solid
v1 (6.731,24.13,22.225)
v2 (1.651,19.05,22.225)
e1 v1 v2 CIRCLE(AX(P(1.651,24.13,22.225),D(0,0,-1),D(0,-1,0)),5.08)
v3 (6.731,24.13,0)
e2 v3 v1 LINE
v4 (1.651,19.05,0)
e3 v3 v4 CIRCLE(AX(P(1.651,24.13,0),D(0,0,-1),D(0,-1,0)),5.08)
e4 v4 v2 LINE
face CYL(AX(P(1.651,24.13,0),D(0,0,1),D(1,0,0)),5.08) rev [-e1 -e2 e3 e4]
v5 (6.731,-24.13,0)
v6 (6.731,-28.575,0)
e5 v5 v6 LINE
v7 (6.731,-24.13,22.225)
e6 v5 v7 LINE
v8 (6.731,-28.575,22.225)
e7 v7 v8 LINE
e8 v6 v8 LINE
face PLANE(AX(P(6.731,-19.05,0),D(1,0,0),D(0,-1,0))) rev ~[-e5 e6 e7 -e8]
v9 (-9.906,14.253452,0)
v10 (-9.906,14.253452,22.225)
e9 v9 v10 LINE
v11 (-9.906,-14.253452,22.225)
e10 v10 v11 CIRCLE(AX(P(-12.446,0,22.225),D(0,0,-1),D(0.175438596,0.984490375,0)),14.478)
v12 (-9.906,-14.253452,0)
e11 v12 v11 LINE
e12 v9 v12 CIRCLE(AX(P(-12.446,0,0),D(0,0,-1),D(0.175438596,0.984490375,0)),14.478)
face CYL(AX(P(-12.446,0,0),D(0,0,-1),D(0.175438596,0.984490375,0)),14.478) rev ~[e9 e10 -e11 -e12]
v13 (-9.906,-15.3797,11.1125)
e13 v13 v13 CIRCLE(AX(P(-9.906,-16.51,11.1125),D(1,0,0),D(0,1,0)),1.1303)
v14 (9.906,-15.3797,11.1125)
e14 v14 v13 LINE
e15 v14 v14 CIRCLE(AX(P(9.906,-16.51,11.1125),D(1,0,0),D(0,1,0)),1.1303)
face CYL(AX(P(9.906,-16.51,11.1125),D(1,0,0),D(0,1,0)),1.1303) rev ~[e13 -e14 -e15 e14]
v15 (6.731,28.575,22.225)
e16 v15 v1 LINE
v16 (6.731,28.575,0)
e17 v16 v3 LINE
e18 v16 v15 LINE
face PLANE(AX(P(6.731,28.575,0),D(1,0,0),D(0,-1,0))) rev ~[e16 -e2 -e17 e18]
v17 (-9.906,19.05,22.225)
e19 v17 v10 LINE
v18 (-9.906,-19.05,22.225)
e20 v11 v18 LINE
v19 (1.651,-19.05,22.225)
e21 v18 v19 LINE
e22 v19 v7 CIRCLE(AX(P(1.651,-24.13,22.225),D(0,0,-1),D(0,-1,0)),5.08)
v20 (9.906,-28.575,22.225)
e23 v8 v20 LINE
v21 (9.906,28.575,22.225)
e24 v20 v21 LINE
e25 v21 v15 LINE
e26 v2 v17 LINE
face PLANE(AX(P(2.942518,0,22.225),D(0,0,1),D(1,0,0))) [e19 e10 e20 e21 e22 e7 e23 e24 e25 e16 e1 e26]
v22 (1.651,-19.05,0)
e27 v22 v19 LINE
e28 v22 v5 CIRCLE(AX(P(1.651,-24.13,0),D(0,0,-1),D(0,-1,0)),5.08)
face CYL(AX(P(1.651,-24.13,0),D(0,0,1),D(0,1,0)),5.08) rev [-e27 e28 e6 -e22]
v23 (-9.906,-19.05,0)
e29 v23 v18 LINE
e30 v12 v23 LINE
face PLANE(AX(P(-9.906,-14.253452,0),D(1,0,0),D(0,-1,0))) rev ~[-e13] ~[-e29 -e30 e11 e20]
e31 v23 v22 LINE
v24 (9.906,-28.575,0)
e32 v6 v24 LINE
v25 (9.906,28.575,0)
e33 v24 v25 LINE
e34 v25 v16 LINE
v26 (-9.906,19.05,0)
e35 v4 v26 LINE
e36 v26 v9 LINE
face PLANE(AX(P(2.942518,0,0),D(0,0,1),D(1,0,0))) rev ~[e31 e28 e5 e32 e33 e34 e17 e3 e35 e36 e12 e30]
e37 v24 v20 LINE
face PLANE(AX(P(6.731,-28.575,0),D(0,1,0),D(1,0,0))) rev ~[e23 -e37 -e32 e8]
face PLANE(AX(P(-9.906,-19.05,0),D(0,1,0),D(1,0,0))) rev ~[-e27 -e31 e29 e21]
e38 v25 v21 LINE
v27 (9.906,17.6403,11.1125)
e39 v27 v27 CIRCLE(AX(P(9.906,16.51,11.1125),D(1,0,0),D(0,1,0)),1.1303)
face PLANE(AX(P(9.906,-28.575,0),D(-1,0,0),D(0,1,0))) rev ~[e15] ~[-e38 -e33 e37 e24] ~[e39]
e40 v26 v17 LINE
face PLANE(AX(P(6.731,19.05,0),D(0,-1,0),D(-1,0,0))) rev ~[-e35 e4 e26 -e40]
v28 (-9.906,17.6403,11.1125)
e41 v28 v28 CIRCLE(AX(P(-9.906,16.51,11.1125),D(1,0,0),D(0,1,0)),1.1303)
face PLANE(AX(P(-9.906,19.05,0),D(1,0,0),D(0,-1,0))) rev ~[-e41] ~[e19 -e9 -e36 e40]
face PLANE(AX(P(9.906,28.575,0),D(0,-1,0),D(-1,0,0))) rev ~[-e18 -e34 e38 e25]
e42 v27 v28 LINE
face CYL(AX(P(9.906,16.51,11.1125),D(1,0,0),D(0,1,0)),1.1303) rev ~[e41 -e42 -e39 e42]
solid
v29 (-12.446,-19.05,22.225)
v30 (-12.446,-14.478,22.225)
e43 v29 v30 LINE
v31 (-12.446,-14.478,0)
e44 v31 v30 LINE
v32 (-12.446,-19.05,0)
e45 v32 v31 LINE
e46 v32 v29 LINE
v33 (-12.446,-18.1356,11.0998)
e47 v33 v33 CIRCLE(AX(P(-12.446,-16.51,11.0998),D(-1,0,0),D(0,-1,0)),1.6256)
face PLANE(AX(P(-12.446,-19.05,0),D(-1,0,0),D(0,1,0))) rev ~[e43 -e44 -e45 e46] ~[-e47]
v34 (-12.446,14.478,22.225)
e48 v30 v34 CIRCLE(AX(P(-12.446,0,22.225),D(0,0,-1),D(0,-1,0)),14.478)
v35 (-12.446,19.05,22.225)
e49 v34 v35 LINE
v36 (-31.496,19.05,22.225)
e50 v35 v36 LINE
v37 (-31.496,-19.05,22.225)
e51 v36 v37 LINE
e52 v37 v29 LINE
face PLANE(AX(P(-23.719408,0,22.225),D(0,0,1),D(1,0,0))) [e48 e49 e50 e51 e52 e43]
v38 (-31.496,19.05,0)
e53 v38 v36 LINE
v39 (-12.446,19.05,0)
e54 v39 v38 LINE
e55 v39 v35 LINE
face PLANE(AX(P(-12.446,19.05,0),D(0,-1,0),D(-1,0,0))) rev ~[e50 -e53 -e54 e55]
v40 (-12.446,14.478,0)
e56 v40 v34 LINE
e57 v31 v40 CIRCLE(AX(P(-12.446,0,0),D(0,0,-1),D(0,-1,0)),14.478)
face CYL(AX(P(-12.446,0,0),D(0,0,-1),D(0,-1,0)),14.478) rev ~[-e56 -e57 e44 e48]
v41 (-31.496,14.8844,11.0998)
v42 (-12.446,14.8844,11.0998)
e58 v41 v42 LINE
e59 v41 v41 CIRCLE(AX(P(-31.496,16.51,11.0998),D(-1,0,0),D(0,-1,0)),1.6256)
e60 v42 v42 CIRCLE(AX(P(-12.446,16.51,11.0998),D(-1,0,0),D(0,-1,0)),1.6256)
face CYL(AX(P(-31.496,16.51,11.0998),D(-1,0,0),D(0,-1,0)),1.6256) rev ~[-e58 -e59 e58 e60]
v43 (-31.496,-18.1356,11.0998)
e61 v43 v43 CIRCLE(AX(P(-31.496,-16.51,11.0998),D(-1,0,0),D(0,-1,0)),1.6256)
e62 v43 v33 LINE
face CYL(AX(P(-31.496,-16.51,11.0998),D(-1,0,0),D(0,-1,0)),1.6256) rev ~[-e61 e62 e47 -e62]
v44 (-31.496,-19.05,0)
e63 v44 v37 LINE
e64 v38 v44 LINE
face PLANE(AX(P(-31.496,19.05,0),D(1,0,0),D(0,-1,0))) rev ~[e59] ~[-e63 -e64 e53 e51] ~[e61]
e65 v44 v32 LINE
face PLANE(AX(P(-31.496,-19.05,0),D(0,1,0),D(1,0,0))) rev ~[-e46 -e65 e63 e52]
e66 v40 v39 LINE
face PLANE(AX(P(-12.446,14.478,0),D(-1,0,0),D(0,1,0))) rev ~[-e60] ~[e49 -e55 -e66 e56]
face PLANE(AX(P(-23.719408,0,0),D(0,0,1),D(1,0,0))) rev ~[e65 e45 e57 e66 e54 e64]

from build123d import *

# Parameters (mm, degrees)
F1_DEPTH = 22.225
F2_R     = 1.1303
F3_DEPTH = 41.403
F4_R     = 5.08
F5_R     = 1.6256
F6_DEPTH = 41.403


with BuildPart() as f1:
    # F0 (on Top) → F1 (new body)
    with BuildSketch(Plane.XY):
        with BuildLine():
            Line((-9.906, -19.05), (6.731, -19.05))
            Line((6.731, -19.05), (6.731, -28.575))
            Line((6.731, -28.575), (9.906, -28.575))
            Line((9.906, -28.575), (9.906, -19.05))
            Line((9.906, -19.05), (9.906, 19.05))
            Line((9.906, 19.05), (9.906, 28.575))
            Line((9.906, 28.575), (6.731, 28.575))
            Line((6.731, 28.575), (6.731, 19.05))
            Line((6.731, 19.05), (-9.906, 19.05))
            Line((-9.906, 19.05), (-9.906, 14.2534516521))
            ThreePointArc((-9.906, 14.2534516521), (2.032, 0), (-9.906, -14.2534516521))
            Line((-9.906, -14.2534516521), (-9.906, -19.05))
        make_face()
    extrude(amount=F1_DEPTH)


with BuildPart() as f1b:
    # F0 (on Top) → F1, piece 2 (new body)
    with BuildSketch(Plane.XY):
        with BuildLine():
            ThreePointArc((-12.446, -14.478), (-26.924, 0), (-12.446, 14.478))
            Line((-12.446, 14.478), (-12.446, 19.05))
            Line((-12.446, 19.05), (-31.496, 19.05))
            Line((-31.496, 19.05), (-31.496, -19.05))
            Line((-31.496, -19.05), (-12.446, -19.05))
            Line((-12.446, -19.05), (-12.446, -14.478))
        make_face()
    extrude(amount=F1_DEPTH)


with BuildPart() as f3_tool:
    # F2 (on face) → F3 (new body, through all)
    with BuildSketch(Plane.YZ.offset(9.906)):
        with Locations((16.51, 11.1125)):
            Circle(F2_R)
        with Locations((-16.51, 11.1125)):
            Circle(F2_R)
    extrude(amount=-F3_DEPTH)


with BuildPart() as f1_1:
    add(f1.part)

    # F3: cut by f3_tool
    add(f3_tool.part, mode=Mode.SUBTRACT)

    # F4
    f4_edges = [f1_1.edges().sort_by_distance(p)[0] for p in [
        (6.731, -19.05, 11.1125),
        (6.731, 19.05, 11.1125),
    ]]
    fillet(f4_edges, radius=F4_R)


with BuildPart() as f1b_1:
    add(f1b.part)

    # F3: cut by f3_tool
    add(f3_tool.part, mode=Mode.SUBTRACT)

    # F5 (on face) → F6 (cut, through all)
    with BuildSketch(Plane(origin=(-31.496, 0, 0), x_dir=(0, -1, 0), z_dir=(-1, 0, 0))):
        with Locations((16.51, 11.0998)):
            Circle(F5_R)
        with Locations((-16.51, 11.0998)):
            Circle(F5_R)
    extrude(amount=-F6_DEPTH, mode=Mode.SUBTRACT)


solid = Compound([f1_1.part, f1b_1.part])
